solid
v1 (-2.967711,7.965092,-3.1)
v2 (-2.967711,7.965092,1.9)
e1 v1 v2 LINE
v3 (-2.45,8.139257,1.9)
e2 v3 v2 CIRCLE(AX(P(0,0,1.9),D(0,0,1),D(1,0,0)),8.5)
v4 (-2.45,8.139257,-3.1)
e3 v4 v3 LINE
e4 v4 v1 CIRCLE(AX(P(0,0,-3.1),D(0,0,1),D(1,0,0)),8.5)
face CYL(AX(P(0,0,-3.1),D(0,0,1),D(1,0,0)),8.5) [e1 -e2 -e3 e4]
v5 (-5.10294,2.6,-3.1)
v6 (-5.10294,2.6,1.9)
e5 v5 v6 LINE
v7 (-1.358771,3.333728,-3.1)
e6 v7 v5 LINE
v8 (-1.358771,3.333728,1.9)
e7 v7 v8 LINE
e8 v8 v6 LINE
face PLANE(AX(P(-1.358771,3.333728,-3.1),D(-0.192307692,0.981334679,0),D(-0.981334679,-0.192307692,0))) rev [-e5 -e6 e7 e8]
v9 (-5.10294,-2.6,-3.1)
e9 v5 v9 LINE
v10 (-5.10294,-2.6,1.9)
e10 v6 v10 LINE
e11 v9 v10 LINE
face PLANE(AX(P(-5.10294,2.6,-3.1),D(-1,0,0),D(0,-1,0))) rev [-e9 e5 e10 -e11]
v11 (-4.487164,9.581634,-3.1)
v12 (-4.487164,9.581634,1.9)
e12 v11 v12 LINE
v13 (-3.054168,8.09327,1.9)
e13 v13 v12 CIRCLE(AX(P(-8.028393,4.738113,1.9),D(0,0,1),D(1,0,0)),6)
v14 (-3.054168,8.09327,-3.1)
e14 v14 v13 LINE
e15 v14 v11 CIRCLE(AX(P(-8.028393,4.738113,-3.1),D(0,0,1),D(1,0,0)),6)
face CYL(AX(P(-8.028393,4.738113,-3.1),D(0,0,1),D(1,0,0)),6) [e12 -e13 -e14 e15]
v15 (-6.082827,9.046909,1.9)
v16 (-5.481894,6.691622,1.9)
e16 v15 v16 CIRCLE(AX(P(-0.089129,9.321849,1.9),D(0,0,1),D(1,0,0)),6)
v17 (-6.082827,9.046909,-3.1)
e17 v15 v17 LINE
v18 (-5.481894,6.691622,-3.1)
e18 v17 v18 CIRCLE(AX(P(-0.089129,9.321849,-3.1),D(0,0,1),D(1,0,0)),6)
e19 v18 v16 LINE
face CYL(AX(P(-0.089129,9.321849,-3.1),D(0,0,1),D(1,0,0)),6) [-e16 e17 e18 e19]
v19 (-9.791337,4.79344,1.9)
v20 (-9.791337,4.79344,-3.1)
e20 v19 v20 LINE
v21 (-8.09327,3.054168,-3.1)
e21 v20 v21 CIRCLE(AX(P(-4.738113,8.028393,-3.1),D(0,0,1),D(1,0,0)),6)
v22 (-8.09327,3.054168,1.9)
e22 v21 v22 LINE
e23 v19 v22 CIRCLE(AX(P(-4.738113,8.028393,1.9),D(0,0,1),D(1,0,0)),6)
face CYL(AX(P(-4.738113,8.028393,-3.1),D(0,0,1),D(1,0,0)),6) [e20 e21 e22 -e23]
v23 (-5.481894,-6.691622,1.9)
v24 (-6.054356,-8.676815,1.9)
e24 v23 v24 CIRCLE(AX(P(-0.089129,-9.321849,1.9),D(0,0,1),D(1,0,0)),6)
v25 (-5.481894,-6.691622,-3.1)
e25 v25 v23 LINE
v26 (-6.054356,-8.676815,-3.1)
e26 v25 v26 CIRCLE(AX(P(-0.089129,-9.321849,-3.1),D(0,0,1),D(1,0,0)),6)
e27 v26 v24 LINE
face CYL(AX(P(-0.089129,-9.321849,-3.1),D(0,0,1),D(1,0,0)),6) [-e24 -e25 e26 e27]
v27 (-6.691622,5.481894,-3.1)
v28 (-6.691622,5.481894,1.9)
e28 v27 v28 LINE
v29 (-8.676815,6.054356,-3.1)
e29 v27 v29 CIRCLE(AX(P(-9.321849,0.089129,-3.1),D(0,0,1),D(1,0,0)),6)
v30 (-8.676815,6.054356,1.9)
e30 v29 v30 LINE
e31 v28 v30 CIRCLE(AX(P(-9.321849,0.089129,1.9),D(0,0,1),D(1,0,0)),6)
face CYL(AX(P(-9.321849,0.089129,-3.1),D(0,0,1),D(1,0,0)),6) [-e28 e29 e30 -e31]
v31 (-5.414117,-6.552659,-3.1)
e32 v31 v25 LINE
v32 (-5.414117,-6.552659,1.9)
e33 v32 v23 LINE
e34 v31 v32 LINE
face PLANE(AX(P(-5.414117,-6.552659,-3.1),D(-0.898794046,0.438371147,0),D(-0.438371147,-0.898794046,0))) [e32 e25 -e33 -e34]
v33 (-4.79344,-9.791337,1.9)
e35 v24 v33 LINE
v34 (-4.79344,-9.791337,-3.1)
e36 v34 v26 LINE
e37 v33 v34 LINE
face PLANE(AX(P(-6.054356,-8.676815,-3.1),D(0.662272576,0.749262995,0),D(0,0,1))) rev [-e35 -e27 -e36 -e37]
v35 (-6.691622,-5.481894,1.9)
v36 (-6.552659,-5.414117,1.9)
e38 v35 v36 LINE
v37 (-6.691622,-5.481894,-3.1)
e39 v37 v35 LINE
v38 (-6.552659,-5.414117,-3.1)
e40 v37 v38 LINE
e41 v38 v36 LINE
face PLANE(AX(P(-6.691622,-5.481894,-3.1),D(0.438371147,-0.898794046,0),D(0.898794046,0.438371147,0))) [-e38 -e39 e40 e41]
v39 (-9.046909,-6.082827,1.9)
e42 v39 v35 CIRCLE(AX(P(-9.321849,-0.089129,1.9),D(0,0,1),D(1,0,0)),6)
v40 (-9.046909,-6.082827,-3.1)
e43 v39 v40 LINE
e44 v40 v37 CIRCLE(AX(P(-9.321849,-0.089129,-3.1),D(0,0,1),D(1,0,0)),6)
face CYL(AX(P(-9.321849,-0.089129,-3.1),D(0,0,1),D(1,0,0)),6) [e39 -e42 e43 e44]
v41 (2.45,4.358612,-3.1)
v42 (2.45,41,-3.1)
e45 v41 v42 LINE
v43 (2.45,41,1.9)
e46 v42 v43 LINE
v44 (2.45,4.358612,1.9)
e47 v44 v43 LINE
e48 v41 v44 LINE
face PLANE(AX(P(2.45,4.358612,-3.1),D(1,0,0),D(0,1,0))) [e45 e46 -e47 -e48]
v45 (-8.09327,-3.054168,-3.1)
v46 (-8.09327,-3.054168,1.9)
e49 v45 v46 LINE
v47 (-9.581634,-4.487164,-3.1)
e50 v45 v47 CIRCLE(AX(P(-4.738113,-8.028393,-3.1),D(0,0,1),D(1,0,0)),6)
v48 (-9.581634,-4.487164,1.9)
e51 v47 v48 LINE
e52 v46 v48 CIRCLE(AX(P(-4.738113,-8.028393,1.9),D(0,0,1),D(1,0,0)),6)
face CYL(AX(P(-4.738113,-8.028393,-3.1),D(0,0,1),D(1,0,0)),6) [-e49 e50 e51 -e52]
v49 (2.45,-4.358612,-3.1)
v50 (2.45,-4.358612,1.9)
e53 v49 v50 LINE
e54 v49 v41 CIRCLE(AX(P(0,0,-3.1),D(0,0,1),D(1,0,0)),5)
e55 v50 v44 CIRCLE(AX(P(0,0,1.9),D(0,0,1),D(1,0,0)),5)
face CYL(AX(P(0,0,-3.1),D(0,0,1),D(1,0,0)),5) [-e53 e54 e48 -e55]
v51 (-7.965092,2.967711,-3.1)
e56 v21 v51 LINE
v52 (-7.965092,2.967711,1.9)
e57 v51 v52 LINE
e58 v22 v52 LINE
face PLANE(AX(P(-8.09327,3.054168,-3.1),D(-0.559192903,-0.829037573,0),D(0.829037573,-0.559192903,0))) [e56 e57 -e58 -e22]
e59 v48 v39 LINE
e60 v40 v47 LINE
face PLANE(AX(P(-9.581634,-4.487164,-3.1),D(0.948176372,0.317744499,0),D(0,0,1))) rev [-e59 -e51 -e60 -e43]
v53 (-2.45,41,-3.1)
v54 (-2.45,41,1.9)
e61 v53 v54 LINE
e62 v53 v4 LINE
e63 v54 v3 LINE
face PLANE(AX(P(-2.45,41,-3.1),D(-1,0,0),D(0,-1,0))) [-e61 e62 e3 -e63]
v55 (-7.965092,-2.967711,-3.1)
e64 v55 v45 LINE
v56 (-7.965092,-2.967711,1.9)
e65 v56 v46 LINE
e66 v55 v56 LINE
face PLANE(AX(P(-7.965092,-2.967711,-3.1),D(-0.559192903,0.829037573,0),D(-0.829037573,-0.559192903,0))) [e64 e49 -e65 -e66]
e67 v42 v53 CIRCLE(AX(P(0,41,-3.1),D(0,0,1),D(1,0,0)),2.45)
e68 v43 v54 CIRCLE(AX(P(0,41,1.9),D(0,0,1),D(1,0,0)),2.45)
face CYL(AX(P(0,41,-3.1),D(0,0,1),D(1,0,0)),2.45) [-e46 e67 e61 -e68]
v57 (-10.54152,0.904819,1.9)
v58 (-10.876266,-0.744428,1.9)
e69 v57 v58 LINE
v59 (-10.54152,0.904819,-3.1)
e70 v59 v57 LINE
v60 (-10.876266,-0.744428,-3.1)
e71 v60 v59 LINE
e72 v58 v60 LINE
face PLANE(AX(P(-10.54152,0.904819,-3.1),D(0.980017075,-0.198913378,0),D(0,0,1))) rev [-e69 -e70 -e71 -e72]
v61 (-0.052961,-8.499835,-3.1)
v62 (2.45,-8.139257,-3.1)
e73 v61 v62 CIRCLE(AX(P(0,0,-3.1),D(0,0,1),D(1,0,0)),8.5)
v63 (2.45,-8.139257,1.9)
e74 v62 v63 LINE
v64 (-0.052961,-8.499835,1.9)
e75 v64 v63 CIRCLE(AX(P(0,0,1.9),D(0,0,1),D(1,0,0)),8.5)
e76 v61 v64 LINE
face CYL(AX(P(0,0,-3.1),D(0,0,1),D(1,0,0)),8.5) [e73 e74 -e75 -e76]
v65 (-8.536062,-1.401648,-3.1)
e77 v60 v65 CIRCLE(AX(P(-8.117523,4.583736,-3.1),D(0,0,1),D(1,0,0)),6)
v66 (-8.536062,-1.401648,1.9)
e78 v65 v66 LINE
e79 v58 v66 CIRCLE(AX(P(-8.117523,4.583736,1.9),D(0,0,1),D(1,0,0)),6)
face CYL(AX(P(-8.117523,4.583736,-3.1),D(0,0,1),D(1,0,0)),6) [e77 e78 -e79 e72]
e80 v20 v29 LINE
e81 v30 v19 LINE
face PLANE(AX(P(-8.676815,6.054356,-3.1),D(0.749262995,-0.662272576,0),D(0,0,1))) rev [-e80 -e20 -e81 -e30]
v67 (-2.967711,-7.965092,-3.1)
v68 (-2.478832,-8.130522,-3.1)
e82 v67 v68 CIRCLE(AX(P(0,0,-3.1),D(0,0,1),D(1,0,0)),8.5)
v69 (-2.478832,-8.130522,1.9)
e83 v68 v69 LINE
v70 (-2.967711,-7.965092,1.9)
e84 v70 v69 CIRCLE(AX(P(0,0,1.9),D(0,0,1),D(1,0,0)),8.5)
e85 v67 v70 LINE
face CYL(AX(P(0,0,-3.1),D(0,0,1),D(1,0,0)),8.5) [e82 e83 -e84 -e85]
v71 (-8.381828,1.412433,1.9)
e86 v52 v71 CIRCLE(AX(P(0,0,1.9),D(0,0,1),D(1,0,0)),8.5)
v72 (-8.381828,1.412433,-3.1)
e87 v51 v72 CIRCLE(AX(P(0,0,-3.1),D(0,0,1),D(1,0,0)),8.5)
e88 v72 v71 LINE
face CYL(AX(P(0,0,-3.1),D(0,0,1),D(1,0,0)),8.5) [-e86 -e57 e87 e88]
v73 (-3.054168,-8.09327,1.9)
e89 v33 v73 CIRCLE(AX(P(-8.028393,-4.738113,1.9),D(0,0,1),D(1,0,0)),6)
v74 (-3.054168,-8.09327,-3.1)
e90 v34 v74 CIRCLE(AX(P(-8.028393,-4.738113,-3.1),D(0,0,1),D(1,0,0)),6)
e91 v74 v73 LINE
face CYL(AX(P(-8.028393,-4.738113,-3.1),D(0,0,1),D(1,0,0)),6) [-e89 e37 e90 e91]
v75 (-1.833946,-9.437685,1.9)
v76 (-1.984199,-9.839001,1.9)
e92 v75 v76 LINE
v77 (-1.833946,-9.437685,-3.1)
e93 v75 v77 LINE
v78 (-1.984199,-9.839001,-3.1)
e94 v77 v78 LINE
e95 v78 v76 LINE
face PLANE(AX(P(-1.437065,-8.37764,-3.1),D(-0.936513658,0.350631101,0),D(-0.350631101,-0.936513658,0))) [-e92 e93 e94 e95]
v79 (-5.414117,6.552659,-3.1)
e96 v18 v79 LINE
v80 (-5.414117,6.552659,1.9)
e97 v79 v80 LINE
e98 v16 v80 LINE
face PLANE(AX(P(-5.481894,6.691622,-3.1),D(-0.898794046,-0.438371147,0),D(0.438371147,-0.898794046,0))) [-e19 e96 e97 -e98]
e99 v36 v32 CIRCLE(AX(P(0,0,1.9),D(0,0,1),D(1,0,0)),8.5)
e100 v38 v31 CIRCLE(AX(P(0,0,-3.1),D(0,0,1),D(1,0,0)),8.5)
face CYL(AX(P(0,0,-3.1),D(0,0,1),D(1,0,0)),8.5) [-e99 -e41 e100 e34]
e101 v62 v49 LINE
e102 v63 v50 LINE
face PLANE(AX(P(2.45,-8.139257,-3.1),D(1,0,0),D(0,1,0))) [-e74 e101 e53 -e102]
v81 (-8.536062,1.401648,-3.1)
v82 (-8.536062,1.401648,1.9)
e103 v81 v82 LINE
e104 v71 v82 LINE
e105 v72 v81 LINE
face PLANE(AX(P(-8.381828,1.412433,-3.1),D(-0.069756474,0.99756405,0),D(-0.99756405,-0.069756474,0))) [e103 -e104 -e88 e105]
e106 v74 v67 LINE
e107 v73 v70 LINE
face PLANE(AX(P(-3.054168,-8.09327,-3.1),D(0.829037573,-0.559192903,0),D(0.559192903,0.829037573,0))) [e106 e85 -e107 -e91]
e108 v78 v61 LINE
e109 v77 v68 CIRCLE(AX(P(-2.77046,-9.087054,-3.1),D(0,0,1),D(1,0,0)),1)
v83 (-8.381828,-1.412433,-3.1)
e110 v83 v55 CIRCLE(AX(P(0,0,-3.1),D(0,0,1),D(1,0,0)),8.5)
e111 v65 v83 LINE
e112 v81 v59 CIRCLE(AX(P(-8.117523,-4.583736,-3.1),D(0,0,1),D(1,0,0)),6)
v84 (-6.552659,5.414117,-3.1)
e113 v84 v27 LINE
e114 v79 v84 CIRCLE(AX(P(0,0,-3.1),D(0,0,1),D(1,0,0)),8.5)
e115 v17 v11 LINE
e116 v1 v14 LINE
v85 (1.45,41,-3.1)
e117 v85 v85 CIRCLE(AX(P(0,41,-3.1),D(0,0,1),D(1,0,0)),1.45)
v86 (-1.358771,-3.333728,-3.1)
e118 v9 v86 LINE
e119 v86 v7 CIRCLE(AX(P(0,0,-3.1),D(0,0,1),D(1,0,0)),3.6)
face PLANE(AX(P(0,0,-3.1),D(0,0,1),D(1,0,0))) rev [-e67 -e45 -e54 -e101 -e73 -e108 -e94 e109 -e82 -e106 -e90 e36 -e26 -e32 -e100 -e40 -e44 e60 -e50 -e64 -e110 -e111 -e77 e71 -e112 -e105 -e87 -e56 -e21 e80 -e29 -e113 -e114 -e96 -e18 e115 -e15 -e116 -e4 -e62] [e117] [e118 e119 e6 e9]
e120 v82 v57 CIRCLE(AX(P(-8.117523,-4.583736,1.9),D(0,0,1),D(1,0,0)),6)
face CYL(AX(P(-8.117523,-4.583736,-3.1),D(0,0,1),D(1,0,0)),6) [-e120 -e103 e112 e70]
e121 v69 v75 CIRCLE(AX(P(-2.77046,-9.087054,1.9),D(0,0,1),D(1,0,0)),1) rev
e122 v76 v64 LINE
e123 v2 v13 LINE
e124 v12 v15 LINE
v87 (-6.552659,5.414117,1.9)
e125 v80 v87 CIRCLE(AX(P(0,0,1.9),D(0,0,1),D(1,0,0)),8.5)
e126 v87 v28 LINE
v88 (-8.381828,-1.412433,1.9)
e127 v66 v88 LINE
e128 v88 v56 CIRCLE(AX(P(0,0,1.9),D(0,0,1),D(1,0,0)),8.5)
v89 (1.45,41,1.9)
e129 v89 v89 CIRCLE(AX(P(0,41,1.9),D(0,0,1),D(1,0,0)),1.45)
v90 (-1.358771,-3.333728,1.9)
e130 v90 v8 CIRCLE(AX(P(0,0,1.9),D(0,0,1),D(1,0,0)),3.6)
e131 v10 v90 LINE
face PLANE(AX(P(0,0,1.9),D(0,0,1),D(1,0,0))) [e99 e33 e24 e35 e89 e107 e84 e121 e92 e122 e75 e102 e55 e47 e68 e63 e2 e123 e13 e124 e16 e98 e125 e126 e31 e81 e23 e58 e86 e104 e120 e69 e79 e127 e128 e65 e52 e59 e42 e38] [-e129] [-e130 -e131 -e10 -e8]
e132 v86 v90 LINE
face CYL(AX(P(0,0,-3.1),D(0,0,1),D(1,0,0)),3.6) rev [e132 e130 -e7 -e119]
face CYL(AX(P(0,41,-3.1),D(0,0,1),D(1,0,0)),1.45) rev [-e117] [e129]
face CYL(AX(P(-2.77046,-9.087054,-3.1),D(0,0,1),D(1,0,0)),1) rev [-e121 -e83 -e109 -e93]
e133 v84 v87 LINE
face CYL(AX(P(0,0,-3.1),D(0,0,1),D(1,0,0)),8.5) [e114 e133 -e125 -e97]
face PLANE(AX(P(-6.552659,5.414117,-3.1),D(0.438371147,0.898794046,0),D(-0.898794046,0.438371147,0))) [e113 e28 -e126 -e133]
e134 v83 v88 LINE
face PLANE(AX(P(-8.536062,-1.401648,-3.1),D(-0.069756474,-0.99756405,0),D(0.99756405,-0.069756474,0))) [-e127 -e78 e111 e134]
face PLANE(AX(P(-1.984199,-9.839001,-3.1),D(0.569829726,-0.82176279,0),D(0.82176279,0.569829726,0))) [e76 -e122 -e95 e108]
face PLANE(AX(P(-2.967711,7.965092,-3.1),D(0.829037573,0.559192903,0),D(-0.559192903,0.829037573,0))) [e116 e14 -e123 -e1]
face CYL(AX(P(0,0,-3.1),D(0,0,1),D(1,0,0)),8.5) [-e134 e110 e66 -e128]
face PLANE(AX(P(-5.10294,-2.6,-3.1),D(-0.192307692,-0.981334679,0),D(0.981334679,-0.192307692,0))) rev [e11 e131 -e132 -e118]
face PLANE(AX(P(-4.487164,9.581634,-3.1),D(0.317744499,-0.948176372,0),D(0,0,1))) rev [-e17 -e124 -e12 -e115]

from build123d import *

# Parameters (mm, degrees)
SKETCH1_R           = 1.45
BOSS_EXTRUDE1_DEPTH = 5
CUT_EXTRUDE2_DEPTH  = 46.350212776
SKETCH5_W           = 3.6
SKETCH5_H           = 5
FILLET1_R           = 1


with BuildPart() as part:
    # Sketch1 → Boss-Extrude1 (new body)
    with BuildSketch(Plane.XY.offset(1.9)):
        with BuildLine():
            Line((2.45, -8.139256723), (2.45, -4.358612164))
            ThreePointArc((2.45, -4.358612164), (5, 0), (2.45, 4.358612164))
            Line((2.45, 4.358612164), (2.45, 41))
            ThreePointArc((2.45, 41), (0, 43.45), (-2.45, 41))
            Line((-2.45, 41), (-2.45, 8.139256723))
            ThreePointArc((-2.45, 8.139256723), (-2.710254715, 8.056334116), (-2.967710696, 7.965092167))
            Line((-2.967710696, 7.965092167), (-3.054167872, 8.093270203))
            ThreePointArc((-3.054167872, 8.093270203), (-4.342095244, 9.472160372), (-5.994566265, 10.382893341))
            ThreePointArc((-5.994566265, 10.382893341), (-6.032083889, 8.496444973), (-5.481893659, 6.691622066))
            Line((-5.481893659, 6.691622066), (-5.414116812, 6.552658937))
            ThreePointArc((-5.414116812, 6.552658937), (-6.01040764, 6.01040764), (-6.552658937, 5.414116812))
            Line((-6.552658937, 5.414116812), (-6.691622066, 5.481893659))
            ThreePointArc((-6.691622066, 5.481893659), (-8.496444973, 6.032083889), (-10.382893341, 5.994566265))
            ThreePointArc((-10.382893341, 5.994566265), (-9.472160372, 4.342095244), (-8.093270203, 3.054167872))
            Line((-8.093270203, 3.054167872), (-7.965092167, 2.967710696))
            ThreePointArc((-7.965092167, 2.967710696), (-8.210369523, 2.199961883), (-8.381827508, 1.41243323))
            Line((-8.381827508, 1.41243323), (-8.536061531, 1.401648136))
            ThreePointArc((-8.536061531, 1.401648136), (-10.374179133, 0.975715399), (-11.989132531, 0))
            ThreePointArc((-11.989132531, 0), (-10.374179133, -0.975715399), (-8.536061531, -1.401648136))
            Line((-8.536061531, -1.401648136), (-8.381827508, -1.41243323))
            ThreePointArc((-8.381827508, -1.41243323), (-8.210369523, -2.199961883), (-7.965092167, -2.967710696))
            Line((-7.965092167, -2.967710696), (-8.093270203, -3.054167872))
            ThreePointArc((-8.093270203, -3.054167872), (-9.472160372, -4.342095244), (-10.382893341, -5.994566265))
            ThreePointArc((-10.382893341, -5.994566265), (-8.496444973, -6.032083889), (-6.691622066, -5.481893659))
            Line((-6.691622066, -5.481893659), (-6.552658937, -5.414116812))
            ThreePointArc((-6.552658937, -5.414116812), (-6.01040764, -6.01040764), (-5.414116812, -6.552658937))
            Line((-5.414116812, -6.552658937), (-5.481893659, -6.691622066))
            ThreePointArc((-5.481893659, -6.691622066), (-6.032083889, -8.496444973), (-5.994566265, -10.382893341))
            ThreePointArc((-5.994566265, -10.382893341), (-4.342095244, -9.472160372), (-3.054167872, -8.093270203))
            Line((-3.054167872, -8.093270203), (-2.967710696, -7.965092167))
            ThreePointArc((-2.967710696, -7.965092167), (-2.212026244, -8.207127384), (-1.437064557, -8.377639611))
            Line((-1.437064557, -8.377639611), (-1.984198903, -9.839001099))
            Line((-1.984198903, -9.839001099), (-0.052960828, -8.499835007))
            ThreePointArc((-0.052960828, -8.499835007), (1.212003867, -8.413147249), (2.45, -8.139256723))
        make_face()
        with Locations((0, 41)):
            Circle(SKETCH1_R, mode=Mode.SUBTRACT)
    extrude(amount=-BOSS_EXTRUDE1_DEPTH)

    # Sketch4 → Cut-Extrude2 (cut, through all)
    with BuildSketch(Plane.XY.offset(1.9)):
        with BuildLine():
            Line((-5.102940329, -2.6), (-1.358771093, -3.333727811))
            ThreePointArc((-1.358771093, -3.333727811), (-3.6, 0), (-1.358771093, 3.333727811))
            Line((-1.358771093, 3.333727811), (-5.102940329, 2.6))
            Line((-5.102940329, 2.6), (-5.102940329, -2.6))
        make_face()
    extrude(amount=-CUT_EXTRUDE2_DEPTH, mode=Mode.SUBTRACT)

    # Sketch5 → Cut-Revolve1 (revolve, cut)
    with BuildSketch(Plane(origin=(0, 0, 0), x_dir=(1, 0, 0), z_dir=(0, 1, 0))):
        with Locations((1.8, 0.6)):
            Rectangle(SKETCH5_W, SKETCH5_H)
    revolve(axis=Axis((0, 0, -3.1), (0, 0, 1)), mode=Mode.SUBTRACT)

    # Chamfer1
    # the kernel refuses this chamfer: 1.996823512, 1.412365401 mm, written as the material it takes off along each edge
    with BuildSketch(Plane(origin=(-5.994566265, -10.382893341, 6.307600342), x_dir=(0.8971018613244867, 0.44182377754953556, 0), z_dir=(0, 0, -1)), Plane(origin=(-10.382893341, -5.994566265, 6.307600342), x_dir=(0.9978248904640776, -0.06592031530834441, 0), z_dir=(0, 0, -1)), Plane(origin=(-11.989132531, 0, 6.307600342), x_dir=(0.8311815460161395, -0.5560011129145519, 0), z_dir=(0, 0, -1)), Plane(origin=(-10.382893341, 5.994566265, 6.307600342), x_dir=(0.4418237775496057, -0.8971018613244522, 0), z_dir=(0, 0, -1)), Plane(origin=(-5.994566265, 10.382893341, 6.307600342), x_dir=(-0.06592031530837167, -0.9978248904640757, 0), z_dir=(0, 0, -1))) as chamfer1_piece_1:
        with BuildLine():
            Line((1.33889649, 0), (0.700148491, -1.556942978))
            ThreePointArc((0.700148491, -1.556942978), (0.305807457, -0.828670891), (0, 0))
            ThreePointArc((0, 0), (0.684607685, 0.037444556), (1.33889649, 0))
        make_face()
    extrude(amount=13.815200684, mode=Mode.SUBTRACT)

    # Fillet1
    fillet1_edges = [part.edges().sort_by_distance(p)[0] for p in [
        (-1.437064557, -8.377639611, -0.6),
    ]]
    fillet(fillet1_edges, radius=FILLET1_R)


solid = part.part
